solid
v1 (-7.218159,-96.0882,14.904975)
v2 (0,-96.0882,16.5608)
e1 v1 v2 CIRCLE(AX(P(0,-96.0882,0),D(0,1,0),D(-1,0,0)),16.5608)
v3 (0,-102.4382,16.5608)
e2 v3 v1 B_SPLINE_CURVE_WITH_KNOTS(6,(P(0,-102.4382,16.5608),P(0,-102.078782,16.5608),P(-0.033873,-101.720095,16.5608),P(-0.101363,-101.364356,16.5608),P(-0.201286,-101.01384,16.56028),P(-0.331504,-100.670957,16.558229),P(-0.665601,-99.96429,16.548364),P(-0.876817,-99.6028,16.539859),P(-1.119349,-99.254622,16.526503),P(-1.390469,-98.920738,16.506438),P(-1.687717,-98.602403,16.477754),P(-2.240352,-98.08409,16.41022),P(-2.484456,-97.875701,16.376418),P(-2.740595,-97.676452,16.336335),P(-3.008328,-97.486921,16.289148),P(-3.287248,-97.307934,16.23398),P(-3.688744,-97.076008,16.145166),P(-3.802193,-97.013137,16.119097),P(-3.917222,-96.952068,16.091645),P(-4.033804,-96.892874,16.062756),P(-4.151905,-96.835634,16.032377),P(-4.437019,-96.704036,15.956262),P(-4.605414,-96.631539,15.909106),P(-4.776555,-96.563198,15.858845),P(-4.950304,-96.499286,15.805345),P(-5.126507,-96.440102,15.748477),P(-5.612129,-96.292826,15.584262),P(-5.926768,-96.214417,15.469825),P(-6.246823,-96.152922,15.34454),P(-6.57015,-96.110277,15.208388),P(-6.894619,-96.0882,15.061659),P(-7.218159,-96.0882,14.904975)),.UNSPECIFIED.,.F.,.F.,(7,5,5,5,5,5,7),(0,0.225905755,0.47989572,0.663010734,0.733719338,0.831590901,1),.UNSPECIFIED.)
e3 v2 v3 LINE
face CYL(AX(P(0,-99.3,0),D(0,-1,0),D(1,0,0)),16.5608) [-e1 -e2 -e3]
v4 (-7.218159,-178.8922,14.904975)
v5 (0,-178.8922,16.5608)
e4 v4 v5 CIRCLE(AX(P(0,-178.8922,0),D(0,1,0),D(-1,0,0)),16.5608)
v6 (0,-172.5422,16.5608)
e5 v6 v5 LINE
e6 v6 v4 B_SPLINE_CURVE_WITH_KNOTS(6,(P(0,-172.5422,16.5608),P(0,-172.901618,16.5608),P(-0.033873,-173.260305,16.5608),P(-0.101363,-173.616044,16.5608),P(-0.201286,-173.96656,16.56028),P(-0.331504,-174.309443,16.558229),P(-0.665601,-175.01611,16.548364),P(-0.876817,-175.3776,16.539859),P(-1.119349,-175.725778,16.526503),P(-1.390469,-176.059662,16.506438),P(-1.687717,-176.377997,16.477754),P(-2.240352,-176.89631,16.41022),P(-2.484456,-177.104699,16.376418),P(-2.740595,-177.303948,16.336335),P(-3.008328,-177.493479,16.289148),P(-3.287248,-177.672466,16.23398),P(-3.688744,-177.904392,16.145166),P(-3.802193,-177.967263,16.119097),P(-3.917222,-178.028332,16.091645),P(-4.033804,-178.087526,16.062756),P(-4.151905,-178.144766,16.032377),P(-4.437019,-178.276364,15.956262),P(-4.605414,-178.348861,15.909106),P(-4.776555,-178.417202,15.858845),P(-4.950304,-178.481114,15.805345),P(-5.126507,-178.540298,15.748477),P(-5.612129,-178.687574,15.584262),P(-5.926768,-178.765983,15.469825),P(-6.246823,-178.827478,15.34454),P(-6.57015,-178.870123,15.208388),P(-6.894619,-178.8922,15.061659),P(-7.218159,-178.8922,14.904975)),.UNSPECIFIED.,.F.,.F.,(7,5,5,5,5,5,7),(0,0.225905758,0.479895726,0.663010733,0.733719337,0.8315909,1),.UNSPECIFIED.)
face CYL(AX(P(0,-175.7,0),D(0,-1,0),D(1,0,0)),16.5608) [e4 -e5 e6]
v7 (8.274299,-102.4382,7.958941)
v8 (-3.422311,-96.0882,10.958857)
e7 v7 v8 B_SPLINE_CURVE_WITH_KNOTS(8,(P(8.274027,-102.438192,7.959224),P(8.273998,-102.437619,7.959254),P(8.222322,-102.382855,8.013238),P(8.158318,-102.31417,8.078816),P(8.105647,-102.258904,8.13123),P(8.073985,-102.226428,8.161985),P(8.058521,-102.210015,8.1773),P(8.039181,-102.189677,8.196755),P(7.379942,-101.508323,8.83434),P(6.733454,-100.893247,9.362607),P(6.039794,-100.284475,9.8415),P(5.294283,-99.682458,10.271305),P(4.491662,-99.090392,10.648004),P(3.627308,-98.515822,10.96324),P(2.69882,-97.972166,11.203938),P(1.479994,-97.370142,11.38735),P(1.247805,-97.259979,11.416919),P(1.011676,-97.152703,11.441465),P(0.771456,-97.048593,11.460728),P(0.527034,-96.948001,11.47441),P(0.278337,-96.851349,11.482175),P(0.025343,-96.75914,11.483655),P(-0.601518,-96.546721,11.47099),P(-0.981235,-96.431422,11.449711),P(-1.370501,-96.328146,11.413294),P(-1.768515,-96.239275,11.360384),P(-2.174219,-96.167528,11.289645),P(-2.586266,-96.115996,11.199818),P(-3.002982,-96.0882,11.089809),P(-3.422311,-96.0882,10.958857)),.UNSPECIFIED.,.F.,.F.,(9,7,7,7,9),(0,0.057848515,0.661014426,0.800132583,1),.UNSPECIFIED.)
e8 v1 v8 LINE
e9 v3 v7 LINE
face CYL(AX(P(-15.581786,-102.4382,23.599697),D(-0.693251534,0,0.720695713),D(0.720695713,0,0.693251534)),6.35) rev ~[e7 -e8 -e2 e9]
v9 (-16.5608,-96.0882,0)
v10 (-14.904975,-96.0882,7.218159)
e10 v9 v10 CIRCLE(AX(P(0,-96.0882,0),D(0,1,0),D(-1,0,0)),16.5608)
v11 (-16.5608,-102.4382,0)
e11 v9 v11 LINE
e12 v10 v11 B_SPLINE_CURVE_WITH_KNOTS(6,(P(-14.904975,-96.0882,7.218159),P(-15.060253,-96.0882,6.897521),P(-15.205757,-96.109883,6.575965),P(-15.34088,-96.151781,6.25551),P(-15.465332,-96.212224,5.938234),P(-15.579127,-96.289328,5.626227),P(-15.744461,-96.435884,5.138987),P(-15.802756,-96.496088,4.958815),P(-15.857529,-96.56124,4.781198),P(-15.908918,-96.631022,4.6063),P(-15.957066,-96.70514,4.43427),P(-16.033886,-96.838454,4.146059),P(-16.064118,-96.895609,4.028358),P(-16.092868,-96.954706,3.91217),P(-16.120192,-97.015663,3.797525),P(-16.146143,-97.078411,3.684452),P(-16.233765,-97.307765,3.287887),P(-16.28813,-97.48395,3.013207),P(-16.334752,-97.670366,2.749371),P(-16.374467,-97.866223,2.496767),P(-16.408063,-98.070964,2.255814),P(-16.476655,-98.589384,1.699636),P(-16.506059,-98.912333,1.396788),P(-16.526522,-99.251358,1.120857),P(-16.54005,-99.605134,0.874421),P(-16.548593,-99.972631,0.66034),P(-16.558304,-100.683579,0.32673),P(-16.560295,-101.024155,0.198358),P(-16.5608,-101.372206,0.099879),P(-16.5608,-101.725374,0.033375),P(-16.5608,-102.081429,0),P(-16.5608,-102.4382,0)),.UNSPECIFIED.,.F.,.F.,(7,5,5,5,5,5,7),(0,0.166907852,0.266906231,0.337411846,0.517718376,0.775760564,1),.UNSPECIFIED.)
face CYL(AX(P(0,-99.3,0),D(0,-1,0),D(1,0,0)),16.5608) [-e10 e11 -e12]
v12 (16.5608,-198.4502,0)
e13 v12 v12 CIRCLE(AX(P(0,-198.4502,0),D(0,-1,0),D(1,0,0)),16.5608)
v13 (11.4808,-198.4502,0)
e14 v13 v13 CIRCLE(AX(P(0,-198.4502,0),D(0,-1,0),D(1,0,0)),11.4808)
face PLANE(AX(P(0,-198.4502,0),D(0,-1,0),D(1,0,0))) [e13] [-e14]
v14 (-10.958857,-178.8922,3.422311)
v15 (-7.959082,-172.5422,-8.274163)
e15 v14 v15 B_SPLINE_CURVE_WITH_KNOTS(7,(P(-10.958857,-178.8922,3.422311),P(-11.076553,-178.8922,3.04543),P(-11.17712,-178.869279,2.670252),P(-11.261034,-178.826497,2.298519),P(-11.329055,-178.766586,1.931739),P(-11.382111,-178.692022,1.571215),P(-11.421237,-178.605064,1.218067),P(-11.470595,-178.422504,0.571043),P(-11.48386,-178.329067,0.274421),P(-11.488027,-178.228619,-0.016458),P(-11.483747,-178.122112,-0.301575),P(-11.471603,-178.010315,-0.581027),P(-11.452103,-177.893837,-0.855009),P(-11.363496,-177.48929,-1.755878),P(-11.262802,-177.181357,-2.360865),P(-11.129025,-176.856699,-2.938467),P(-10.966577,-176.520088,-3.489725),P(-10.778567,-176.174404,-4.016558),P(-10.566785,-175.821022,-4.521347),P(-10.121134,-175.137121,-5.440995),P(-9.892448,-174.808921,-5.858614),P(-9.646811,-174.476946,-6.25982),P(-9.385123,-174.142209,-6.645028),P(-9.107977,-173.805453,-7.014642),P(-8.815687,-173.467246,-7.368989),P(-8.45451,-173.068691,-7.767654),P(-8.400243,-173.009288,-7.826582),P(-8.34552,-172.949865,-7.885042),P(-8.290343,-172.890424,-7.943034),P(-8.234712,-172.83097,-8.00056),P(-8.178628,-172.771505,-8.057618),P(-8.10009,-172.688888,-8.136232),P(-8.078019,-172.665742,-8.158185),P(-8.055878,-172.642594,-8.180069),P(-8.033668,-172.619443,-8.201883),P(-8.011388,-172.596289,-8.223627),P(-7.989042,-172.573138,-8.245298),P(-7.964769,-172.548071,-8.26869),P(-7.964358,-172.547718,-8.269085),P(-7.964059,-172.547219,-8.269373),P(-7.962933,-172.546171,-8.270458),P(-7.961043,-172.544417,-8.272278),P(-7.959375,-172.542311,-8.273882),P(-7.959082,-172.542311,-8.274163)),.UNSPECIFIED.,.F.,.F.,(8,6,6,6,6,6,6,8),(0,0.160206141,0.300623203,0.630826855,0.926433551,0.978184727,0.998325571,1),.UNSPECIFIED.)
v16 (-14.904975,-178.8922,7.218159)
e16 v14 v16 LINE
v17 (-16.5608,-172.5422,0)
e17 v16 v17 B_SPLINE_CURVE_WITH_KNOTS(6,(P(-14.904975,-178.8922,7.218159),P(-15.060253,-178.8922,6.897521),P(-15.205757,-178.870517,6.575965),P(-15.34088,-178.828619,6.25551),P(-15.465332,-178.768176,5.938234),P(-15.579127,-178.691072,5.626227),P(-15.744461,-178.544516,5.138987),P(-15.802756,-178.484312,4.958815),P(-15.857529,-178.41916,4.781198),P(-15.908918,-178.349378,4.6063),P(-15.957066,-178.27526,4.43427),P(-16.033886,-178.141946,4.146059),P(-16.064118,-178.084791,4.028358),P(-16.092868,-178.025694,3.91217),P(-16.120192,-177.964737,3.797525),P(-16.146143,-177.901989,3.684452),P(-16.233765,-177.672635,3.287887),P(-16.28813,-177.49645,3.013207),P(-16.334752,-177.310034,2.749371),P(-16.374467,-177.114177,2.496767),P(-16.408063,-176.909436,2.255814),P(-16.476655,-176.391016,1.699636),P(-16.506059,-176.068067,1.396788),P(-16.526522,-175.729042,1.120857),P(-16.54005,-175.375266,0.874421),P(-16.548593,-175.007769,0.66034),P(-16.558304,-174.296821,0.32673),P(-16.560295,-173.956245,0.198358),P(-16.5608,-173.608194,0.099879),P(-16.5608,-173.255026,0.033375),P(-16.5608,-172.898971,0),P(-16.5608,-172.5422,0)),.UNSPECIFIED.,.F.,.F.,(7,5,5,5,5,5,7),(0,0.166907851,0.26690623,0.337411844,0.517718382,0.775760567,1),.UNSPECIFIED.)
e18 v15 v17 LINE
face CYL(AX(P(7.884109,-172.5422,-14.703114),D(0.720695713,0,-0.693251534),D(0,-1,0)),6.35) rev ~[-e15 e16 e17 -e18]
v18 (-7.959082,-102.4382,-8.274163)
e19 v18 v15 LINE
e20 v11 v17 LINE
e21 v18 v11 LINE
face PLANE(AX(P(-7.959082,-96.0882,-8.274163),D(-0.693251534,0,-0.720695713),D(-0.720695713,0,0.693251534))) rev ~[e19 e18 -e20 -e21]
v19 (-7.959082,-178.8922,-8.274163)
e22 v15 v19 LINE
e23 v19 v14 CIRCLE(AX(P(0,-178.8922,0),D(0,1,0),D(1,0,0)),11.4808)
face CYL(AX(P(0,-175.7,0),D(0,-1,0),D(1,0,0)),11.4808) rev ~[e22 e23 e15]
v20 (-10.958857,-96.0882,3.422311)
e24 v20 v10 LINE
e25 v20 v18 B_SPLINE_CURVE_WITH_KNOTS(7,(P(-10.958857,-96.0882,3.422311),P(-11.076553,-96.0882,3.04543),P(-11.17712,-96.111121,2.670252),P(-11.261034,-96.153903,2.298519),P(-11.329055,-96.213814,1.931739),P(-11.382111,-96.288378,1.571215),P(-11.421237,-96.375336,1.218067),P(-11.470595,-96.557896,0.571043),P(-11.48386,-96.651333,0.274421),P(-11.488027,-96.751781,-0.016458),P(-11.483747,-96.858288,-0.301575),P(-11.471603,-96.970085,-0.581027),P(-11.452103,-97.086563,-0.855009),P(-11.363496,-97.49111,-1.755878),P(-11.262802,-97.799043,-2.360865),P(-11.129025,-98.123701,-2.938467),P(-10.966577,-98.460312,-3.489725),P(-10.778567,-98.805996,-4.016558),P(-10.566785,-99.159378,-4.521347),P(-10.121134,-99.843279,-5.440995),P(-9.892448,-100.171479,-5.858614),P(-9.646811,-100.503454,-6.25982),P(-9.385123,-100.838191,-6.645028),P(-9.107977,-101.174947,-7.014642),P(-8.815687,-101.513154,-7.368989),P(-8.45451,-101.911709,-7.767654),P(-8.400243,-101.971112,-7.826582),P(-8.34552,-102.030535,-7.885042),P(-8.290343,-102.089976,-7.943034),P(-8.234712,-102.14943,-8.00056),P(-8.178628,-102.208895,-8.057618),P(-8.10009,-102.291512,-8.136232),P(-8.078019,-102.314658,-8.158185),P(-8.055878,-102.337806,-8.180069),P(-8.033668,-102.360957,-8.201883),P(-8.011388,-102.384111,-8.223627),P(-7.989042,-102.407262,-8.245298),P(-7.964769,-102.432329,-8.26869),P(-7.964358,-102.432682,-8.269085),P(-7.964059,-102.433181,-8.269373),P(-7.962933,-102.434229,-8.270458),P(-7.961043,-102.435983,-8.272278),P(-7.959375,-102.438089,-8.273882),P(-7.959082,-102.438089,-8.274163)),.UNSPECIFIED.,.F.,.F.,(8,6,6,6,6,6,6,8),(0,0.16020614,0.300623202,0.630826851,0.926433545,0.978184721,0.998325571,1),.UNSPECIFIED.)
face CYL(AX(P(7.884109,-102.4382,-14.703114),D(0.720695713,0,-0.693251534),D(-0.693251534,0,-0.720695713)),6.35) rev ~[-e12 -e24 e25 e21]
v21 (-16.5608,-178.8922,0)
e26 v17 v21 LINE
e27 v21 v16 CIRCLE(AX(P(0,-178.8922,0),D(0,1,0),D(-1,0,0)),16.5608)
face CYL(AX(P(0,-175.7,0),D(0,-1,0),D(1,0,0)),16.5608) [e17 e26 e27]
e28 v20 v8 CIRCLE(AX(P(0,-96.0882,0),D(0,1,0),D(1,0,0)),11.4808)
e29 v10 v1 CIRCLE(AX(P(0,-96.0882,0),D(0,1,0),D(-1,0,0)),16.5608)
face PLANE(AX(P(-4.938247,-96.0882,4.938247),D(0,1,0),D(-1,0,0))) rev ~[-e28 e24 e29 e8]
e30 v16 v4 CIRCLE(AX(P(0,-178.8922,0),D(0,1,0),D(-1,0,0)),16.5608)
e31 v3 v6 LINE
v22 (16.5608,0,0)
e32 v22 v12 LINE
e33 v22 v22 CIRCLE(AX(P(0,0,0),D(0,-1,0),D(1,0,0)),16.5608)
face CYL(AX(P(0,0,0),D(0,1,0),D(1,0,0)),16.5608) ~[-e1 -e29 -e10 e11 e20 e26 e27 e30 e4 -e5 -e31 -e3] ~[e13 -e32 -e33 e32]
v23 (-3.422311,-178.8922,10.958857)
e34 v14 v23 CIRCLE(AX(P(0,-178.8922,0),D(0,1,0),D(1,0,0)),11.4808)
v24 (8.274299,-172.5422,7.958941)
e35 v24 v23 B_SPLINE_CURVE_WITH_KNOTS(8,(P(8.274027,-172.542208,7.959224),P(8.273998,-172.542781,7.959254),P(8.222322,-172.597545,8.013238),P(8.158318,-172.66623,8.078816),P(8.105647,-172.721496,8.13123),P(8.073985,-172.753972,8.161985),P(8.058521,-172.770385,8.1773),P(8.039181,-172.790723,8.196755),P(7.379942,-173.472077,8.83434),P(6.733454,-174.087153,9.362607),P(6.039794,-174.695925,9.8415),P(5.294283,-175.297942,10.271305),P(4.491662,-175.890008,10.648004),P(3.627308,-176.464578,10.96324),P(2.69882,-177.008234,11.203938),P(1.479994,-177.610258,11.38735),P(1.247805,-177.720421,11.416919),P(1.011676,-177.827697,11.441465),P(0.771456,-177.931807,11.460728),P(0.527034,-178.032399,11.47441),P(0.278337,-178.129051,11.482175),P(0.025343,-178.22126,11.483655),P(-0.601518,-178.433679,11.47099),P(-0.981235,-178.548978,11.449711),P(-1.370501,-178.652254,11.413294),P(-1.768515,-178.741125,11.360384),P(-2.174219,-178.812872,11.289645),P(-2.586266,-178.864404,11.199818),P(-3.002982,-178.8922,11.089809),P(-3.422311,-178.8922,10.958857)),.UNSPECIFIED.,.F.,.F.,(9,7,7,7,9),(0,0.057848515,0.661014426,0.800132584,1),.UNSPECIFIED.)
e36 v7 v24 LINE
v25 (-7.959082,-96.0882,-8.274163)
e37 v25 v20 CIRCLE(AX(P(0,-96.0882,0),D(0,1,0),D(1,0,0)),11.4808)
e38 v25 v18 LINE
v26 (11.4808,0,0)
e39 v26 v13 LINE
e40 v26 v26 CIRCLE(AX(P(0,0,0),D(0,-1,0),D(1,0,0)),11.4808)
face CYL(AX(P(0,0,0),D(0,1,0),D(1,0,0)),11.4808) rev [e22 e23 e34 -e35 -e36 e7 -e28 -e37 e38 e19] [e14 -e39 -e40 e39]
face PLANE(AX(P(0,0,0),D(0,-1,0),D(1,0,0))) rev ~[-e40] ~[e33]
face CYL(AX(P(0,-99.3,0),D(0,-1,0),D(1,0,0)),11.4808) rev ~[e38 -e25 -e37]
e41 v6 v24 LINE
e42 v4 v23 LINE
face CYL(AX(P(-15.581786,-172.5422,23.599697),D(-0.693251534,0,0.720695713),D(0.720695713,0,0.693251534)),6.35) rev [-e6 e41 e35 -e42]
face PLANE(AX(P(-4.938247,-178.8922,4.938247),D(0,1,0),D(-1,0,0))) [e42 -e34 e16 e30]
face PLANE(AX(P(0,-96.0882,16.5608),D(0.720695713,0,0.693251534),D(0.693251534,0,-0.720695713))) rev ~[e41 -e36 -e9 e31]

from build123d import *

# Parameters (mm, degrees)
F0_R         = 16.5608
F0_R_2       = 11.4808
F1_DEPTH     = 198.4502
F4_DEPTH     = 82.804
F5_T4_DEPTH  = 43.6852975665
F5_S5_R      = 16.5608
F5_T6_DEPTH  = 27
F5_S7_R      = 11.4808
F5_T8_DEPTH  = 27
F5_T12_DEPTH = 43.6852975665
F5_S13_R     = 16.5608
F5_T14_DEPTH = 27
F5_S15_R     = 11.4808
F5_T16_DEPTH = 27
F5_T20_DEPTH = 43.6852975665
F5_S21_R     = 16.5608
F5_T22_DEPTH = 27
F5_S23_R     = 11.4808
F5_T24_DEPTH = 27
F5_T28_DEPTH = 43.6852975665
F5_S29_R     = 16.5608
F5_T30_DEPTH = 27
F5_S31_R     = 11.4808
F5_T32_DEPTH = 27


# Not quite as in the source:
# - a fillet or chamfer that OpenCascade refuses, or shapes differently, is made with other operations: its cross-section is extruded or revolved along the edge and cut away or added


with BuildPart() as f1:
    # F0 (on Front) → F1 (new body)
    with BuildSketch(Plane.XZ):
        Circle(F0_R)
        Circle(F0_R_2, mode=Mode.SUBTRACT)
    extrude(amount=F1_DEPTH)

    # F3 (on offset) → F4 (cut)
    with BuildSketch(Plane(origin=(0, -96.0882, 0), x_dir=(-1, 0, 0), z_dir=(0, 1, 0))):
        with BuildLine():
            Line((7.9590822086, -8.2741633436), (16.5608, 0))
            ThreePointArc((16.5608, 0), (11.7102539819, 11.7102539819), (0, 16.5608))
            Line((0, 16.5608), (-8.2741633436, 7.9590822086))
            Line((-8.2741633436, 7.9590822086), (7.9590822086, -8.2741633436))
        make_face()
    extrude(amount=-F4_DEPTH, mode=Mode.SUBTRACT)

    # F5: fillet of radius 6.35 on 4 edges, made by hand


with BuildPart() as f5_tool2:
    # F5_s3 → F5_t4 (new body)
    with BuildSketch(Plane(origin=(-19.2795314418, 0, 20.0427622378), x_dir=(0, 1, 0), z_dir=(0.6932515337, 0, -0.7206957132))):
        with BuildLine():
            ThreePointArc((-102.4382, 11.4808), (-97.9480719395, 9.6209280605), (-96.0882, 5.1308))
            Line((-96.0882, 5.1308), (-96.0882, 11.4808))
            Line((-96.0882, 11.4808), (-102.4382, 11.4808))
        make_face()
    extrude(amount=F5_T4_DEPTH)

    # F5_s5 → F5_t6 (intersect, symmetric)
    with BuildSketch(Plane.XZ.offset(99.3)):
        Circle(F5_S5_R)
    extrude(amount=F5_T6_DEPTH, both=True, mode=Mode.INTERSECT)

    # F5_s7 → F5_t8 (cut, symmetric)
    with BuildSketch(Plane.XZ.offset(99.3)):
        Circle(F5_S7_R)
    extrude(amount=F5_T8_DEPTH, both=True, mode=Mode.SUBTRACT)


with BuildPart() as f1_1:
    add(f1.part)

    # F5_t1: union F5_tool2
    add(f5_tool2.part)


with BuildPart() as f5_tool10:
    # F5_s11 → F5_t12 (new body)
    with BuildSketch(Plane(origin=(11.4410444464, 0, -11.0053680982), x_dir=(0, 1, 0), z_dir=(-0.7206957132, 0, 0.6932515337))):
        with BuildLine():
            ThreePointArc((-102.4382, 11.4808), (-97.9480719395, 9.6209280605), (-96.0882, 5.1308))
            Line((-96.0882, 5.1308), (-96.0882, 11.4808))
            Line((-96.0882, 11.4808), (-102.4382, 11.4808))
        make_face()
    extrude(amount=F5_T12_DEPTH)

    # F5_s13 → F5_t14 (intersect, symmetric)
    with BuildSketch(Plane.XZ.offset(99.3)):
        Circle(F5_S13_R)
    extrude(amount=F5_T14_DEPTH, both=True, mode=Mode.INTERSECT)

    # F5_s15 → F5_t16 (cut, symmetric)
    with BuildSketch(Plane.XZ.offset(99.3)):
        Circle(F5_S15_R)
    extrude(amount=F5_T16_DEPTH, both=True, mode=Mode.SUBTRACT)


with BuildPart() as f1_2:
    add(f1_1.part)

    # F5_t9: union F5_tool10
    add(f5_tool10.part)


with BuildPart() as f5_tool18:
    # F5_s19 → F5_t20 (new body)
    with BuildSketch(Plane(origin=(-19.2795314418, 0, 20.0427622378), x_dir=(0, 1, 0), z_dir=(0.6932515337, 0, -0.7206957132))):
        with BuildLine():
            ThreePointArc((-172.5422, 11.4808), (-177.0323280605, 9.6209280605), (-178.8922, 5.1308))
            Line((-178.8922, 5.1308), (-178.8922, 11.4808))
            Line((-178.8922, 11.4808), (-172.5422, 11.4808))
        make_face()
    extrude(amount=F5_T20_DEPTH)

    # F5_s21 → F5_t22 (intersect, symmetric)
    with BuildSketch(Plane.XZ.offset(175.7)):
        Circle(F5_S21_R)
    extrude(amount=F5_T22_DEPTH, both=True, mode=Mode.INTERSECT)

    # F5_s23 → F5_t24 (cut, symmetric)
    with BuildSketch(Plane.XZ.offset(175.7)):
        Circle(F5_S23_R)
    extrude(amount=F5_T24_DEPTH, both=True, mode=Mode.SUBTRACT)


with BuildPart() as f1_3:
    add(f1_2.part)

    # F5_t17: union F5_tool18
    add(f5_tool18.part)


with BuildPart() as f5_tool26:
    # F5_s27 → F5_t28 (new body)
    with BuildSketch(Plane(origin=(11.4410444464, 0, -11.0053680982), x_dir=(0, 1, 0), z_dir=(-0.7206957132, 0, 0.6932515337))):
        with BuildLine():
            ThreePointArc((-178.8922, 5.1308), (-177.0323280605, 9.6209280605), (-172.5422, 11.4808))
            Line((-172.5422, 11.4808), (-178.8922, 11.4808))
            Line((-178.8922, 11.4808), (-178.8922, 5.1308))
        make_face()
    extrude(amount=F5_T28_DEPTH)

    # F5_s29 → F5_t30 (intersect, symmetric)
    with BuildSketch(Plane.XZ.offset(175.7)):
        Circle(F5_S29_R)
    extrude(amount=F5_T30_DEPTH, both=True, mode=Mode.INTERSECT)

    # F5_s31 → F5_t32 (cut, symmetric)
    with BuildSketch(Plane.XZ.offset(175.7)):
        Circle(F5_S31_R)
    extrude(amount=F5_T32_DEPTH, both=True, mode=Mode.SUBTRACT)


with BuildPart() as f1_4:
    add(f1_3.part)

    # F5_t25: union F5_tool26
    add(f5_tool26.part)


solid = f1_4.part
